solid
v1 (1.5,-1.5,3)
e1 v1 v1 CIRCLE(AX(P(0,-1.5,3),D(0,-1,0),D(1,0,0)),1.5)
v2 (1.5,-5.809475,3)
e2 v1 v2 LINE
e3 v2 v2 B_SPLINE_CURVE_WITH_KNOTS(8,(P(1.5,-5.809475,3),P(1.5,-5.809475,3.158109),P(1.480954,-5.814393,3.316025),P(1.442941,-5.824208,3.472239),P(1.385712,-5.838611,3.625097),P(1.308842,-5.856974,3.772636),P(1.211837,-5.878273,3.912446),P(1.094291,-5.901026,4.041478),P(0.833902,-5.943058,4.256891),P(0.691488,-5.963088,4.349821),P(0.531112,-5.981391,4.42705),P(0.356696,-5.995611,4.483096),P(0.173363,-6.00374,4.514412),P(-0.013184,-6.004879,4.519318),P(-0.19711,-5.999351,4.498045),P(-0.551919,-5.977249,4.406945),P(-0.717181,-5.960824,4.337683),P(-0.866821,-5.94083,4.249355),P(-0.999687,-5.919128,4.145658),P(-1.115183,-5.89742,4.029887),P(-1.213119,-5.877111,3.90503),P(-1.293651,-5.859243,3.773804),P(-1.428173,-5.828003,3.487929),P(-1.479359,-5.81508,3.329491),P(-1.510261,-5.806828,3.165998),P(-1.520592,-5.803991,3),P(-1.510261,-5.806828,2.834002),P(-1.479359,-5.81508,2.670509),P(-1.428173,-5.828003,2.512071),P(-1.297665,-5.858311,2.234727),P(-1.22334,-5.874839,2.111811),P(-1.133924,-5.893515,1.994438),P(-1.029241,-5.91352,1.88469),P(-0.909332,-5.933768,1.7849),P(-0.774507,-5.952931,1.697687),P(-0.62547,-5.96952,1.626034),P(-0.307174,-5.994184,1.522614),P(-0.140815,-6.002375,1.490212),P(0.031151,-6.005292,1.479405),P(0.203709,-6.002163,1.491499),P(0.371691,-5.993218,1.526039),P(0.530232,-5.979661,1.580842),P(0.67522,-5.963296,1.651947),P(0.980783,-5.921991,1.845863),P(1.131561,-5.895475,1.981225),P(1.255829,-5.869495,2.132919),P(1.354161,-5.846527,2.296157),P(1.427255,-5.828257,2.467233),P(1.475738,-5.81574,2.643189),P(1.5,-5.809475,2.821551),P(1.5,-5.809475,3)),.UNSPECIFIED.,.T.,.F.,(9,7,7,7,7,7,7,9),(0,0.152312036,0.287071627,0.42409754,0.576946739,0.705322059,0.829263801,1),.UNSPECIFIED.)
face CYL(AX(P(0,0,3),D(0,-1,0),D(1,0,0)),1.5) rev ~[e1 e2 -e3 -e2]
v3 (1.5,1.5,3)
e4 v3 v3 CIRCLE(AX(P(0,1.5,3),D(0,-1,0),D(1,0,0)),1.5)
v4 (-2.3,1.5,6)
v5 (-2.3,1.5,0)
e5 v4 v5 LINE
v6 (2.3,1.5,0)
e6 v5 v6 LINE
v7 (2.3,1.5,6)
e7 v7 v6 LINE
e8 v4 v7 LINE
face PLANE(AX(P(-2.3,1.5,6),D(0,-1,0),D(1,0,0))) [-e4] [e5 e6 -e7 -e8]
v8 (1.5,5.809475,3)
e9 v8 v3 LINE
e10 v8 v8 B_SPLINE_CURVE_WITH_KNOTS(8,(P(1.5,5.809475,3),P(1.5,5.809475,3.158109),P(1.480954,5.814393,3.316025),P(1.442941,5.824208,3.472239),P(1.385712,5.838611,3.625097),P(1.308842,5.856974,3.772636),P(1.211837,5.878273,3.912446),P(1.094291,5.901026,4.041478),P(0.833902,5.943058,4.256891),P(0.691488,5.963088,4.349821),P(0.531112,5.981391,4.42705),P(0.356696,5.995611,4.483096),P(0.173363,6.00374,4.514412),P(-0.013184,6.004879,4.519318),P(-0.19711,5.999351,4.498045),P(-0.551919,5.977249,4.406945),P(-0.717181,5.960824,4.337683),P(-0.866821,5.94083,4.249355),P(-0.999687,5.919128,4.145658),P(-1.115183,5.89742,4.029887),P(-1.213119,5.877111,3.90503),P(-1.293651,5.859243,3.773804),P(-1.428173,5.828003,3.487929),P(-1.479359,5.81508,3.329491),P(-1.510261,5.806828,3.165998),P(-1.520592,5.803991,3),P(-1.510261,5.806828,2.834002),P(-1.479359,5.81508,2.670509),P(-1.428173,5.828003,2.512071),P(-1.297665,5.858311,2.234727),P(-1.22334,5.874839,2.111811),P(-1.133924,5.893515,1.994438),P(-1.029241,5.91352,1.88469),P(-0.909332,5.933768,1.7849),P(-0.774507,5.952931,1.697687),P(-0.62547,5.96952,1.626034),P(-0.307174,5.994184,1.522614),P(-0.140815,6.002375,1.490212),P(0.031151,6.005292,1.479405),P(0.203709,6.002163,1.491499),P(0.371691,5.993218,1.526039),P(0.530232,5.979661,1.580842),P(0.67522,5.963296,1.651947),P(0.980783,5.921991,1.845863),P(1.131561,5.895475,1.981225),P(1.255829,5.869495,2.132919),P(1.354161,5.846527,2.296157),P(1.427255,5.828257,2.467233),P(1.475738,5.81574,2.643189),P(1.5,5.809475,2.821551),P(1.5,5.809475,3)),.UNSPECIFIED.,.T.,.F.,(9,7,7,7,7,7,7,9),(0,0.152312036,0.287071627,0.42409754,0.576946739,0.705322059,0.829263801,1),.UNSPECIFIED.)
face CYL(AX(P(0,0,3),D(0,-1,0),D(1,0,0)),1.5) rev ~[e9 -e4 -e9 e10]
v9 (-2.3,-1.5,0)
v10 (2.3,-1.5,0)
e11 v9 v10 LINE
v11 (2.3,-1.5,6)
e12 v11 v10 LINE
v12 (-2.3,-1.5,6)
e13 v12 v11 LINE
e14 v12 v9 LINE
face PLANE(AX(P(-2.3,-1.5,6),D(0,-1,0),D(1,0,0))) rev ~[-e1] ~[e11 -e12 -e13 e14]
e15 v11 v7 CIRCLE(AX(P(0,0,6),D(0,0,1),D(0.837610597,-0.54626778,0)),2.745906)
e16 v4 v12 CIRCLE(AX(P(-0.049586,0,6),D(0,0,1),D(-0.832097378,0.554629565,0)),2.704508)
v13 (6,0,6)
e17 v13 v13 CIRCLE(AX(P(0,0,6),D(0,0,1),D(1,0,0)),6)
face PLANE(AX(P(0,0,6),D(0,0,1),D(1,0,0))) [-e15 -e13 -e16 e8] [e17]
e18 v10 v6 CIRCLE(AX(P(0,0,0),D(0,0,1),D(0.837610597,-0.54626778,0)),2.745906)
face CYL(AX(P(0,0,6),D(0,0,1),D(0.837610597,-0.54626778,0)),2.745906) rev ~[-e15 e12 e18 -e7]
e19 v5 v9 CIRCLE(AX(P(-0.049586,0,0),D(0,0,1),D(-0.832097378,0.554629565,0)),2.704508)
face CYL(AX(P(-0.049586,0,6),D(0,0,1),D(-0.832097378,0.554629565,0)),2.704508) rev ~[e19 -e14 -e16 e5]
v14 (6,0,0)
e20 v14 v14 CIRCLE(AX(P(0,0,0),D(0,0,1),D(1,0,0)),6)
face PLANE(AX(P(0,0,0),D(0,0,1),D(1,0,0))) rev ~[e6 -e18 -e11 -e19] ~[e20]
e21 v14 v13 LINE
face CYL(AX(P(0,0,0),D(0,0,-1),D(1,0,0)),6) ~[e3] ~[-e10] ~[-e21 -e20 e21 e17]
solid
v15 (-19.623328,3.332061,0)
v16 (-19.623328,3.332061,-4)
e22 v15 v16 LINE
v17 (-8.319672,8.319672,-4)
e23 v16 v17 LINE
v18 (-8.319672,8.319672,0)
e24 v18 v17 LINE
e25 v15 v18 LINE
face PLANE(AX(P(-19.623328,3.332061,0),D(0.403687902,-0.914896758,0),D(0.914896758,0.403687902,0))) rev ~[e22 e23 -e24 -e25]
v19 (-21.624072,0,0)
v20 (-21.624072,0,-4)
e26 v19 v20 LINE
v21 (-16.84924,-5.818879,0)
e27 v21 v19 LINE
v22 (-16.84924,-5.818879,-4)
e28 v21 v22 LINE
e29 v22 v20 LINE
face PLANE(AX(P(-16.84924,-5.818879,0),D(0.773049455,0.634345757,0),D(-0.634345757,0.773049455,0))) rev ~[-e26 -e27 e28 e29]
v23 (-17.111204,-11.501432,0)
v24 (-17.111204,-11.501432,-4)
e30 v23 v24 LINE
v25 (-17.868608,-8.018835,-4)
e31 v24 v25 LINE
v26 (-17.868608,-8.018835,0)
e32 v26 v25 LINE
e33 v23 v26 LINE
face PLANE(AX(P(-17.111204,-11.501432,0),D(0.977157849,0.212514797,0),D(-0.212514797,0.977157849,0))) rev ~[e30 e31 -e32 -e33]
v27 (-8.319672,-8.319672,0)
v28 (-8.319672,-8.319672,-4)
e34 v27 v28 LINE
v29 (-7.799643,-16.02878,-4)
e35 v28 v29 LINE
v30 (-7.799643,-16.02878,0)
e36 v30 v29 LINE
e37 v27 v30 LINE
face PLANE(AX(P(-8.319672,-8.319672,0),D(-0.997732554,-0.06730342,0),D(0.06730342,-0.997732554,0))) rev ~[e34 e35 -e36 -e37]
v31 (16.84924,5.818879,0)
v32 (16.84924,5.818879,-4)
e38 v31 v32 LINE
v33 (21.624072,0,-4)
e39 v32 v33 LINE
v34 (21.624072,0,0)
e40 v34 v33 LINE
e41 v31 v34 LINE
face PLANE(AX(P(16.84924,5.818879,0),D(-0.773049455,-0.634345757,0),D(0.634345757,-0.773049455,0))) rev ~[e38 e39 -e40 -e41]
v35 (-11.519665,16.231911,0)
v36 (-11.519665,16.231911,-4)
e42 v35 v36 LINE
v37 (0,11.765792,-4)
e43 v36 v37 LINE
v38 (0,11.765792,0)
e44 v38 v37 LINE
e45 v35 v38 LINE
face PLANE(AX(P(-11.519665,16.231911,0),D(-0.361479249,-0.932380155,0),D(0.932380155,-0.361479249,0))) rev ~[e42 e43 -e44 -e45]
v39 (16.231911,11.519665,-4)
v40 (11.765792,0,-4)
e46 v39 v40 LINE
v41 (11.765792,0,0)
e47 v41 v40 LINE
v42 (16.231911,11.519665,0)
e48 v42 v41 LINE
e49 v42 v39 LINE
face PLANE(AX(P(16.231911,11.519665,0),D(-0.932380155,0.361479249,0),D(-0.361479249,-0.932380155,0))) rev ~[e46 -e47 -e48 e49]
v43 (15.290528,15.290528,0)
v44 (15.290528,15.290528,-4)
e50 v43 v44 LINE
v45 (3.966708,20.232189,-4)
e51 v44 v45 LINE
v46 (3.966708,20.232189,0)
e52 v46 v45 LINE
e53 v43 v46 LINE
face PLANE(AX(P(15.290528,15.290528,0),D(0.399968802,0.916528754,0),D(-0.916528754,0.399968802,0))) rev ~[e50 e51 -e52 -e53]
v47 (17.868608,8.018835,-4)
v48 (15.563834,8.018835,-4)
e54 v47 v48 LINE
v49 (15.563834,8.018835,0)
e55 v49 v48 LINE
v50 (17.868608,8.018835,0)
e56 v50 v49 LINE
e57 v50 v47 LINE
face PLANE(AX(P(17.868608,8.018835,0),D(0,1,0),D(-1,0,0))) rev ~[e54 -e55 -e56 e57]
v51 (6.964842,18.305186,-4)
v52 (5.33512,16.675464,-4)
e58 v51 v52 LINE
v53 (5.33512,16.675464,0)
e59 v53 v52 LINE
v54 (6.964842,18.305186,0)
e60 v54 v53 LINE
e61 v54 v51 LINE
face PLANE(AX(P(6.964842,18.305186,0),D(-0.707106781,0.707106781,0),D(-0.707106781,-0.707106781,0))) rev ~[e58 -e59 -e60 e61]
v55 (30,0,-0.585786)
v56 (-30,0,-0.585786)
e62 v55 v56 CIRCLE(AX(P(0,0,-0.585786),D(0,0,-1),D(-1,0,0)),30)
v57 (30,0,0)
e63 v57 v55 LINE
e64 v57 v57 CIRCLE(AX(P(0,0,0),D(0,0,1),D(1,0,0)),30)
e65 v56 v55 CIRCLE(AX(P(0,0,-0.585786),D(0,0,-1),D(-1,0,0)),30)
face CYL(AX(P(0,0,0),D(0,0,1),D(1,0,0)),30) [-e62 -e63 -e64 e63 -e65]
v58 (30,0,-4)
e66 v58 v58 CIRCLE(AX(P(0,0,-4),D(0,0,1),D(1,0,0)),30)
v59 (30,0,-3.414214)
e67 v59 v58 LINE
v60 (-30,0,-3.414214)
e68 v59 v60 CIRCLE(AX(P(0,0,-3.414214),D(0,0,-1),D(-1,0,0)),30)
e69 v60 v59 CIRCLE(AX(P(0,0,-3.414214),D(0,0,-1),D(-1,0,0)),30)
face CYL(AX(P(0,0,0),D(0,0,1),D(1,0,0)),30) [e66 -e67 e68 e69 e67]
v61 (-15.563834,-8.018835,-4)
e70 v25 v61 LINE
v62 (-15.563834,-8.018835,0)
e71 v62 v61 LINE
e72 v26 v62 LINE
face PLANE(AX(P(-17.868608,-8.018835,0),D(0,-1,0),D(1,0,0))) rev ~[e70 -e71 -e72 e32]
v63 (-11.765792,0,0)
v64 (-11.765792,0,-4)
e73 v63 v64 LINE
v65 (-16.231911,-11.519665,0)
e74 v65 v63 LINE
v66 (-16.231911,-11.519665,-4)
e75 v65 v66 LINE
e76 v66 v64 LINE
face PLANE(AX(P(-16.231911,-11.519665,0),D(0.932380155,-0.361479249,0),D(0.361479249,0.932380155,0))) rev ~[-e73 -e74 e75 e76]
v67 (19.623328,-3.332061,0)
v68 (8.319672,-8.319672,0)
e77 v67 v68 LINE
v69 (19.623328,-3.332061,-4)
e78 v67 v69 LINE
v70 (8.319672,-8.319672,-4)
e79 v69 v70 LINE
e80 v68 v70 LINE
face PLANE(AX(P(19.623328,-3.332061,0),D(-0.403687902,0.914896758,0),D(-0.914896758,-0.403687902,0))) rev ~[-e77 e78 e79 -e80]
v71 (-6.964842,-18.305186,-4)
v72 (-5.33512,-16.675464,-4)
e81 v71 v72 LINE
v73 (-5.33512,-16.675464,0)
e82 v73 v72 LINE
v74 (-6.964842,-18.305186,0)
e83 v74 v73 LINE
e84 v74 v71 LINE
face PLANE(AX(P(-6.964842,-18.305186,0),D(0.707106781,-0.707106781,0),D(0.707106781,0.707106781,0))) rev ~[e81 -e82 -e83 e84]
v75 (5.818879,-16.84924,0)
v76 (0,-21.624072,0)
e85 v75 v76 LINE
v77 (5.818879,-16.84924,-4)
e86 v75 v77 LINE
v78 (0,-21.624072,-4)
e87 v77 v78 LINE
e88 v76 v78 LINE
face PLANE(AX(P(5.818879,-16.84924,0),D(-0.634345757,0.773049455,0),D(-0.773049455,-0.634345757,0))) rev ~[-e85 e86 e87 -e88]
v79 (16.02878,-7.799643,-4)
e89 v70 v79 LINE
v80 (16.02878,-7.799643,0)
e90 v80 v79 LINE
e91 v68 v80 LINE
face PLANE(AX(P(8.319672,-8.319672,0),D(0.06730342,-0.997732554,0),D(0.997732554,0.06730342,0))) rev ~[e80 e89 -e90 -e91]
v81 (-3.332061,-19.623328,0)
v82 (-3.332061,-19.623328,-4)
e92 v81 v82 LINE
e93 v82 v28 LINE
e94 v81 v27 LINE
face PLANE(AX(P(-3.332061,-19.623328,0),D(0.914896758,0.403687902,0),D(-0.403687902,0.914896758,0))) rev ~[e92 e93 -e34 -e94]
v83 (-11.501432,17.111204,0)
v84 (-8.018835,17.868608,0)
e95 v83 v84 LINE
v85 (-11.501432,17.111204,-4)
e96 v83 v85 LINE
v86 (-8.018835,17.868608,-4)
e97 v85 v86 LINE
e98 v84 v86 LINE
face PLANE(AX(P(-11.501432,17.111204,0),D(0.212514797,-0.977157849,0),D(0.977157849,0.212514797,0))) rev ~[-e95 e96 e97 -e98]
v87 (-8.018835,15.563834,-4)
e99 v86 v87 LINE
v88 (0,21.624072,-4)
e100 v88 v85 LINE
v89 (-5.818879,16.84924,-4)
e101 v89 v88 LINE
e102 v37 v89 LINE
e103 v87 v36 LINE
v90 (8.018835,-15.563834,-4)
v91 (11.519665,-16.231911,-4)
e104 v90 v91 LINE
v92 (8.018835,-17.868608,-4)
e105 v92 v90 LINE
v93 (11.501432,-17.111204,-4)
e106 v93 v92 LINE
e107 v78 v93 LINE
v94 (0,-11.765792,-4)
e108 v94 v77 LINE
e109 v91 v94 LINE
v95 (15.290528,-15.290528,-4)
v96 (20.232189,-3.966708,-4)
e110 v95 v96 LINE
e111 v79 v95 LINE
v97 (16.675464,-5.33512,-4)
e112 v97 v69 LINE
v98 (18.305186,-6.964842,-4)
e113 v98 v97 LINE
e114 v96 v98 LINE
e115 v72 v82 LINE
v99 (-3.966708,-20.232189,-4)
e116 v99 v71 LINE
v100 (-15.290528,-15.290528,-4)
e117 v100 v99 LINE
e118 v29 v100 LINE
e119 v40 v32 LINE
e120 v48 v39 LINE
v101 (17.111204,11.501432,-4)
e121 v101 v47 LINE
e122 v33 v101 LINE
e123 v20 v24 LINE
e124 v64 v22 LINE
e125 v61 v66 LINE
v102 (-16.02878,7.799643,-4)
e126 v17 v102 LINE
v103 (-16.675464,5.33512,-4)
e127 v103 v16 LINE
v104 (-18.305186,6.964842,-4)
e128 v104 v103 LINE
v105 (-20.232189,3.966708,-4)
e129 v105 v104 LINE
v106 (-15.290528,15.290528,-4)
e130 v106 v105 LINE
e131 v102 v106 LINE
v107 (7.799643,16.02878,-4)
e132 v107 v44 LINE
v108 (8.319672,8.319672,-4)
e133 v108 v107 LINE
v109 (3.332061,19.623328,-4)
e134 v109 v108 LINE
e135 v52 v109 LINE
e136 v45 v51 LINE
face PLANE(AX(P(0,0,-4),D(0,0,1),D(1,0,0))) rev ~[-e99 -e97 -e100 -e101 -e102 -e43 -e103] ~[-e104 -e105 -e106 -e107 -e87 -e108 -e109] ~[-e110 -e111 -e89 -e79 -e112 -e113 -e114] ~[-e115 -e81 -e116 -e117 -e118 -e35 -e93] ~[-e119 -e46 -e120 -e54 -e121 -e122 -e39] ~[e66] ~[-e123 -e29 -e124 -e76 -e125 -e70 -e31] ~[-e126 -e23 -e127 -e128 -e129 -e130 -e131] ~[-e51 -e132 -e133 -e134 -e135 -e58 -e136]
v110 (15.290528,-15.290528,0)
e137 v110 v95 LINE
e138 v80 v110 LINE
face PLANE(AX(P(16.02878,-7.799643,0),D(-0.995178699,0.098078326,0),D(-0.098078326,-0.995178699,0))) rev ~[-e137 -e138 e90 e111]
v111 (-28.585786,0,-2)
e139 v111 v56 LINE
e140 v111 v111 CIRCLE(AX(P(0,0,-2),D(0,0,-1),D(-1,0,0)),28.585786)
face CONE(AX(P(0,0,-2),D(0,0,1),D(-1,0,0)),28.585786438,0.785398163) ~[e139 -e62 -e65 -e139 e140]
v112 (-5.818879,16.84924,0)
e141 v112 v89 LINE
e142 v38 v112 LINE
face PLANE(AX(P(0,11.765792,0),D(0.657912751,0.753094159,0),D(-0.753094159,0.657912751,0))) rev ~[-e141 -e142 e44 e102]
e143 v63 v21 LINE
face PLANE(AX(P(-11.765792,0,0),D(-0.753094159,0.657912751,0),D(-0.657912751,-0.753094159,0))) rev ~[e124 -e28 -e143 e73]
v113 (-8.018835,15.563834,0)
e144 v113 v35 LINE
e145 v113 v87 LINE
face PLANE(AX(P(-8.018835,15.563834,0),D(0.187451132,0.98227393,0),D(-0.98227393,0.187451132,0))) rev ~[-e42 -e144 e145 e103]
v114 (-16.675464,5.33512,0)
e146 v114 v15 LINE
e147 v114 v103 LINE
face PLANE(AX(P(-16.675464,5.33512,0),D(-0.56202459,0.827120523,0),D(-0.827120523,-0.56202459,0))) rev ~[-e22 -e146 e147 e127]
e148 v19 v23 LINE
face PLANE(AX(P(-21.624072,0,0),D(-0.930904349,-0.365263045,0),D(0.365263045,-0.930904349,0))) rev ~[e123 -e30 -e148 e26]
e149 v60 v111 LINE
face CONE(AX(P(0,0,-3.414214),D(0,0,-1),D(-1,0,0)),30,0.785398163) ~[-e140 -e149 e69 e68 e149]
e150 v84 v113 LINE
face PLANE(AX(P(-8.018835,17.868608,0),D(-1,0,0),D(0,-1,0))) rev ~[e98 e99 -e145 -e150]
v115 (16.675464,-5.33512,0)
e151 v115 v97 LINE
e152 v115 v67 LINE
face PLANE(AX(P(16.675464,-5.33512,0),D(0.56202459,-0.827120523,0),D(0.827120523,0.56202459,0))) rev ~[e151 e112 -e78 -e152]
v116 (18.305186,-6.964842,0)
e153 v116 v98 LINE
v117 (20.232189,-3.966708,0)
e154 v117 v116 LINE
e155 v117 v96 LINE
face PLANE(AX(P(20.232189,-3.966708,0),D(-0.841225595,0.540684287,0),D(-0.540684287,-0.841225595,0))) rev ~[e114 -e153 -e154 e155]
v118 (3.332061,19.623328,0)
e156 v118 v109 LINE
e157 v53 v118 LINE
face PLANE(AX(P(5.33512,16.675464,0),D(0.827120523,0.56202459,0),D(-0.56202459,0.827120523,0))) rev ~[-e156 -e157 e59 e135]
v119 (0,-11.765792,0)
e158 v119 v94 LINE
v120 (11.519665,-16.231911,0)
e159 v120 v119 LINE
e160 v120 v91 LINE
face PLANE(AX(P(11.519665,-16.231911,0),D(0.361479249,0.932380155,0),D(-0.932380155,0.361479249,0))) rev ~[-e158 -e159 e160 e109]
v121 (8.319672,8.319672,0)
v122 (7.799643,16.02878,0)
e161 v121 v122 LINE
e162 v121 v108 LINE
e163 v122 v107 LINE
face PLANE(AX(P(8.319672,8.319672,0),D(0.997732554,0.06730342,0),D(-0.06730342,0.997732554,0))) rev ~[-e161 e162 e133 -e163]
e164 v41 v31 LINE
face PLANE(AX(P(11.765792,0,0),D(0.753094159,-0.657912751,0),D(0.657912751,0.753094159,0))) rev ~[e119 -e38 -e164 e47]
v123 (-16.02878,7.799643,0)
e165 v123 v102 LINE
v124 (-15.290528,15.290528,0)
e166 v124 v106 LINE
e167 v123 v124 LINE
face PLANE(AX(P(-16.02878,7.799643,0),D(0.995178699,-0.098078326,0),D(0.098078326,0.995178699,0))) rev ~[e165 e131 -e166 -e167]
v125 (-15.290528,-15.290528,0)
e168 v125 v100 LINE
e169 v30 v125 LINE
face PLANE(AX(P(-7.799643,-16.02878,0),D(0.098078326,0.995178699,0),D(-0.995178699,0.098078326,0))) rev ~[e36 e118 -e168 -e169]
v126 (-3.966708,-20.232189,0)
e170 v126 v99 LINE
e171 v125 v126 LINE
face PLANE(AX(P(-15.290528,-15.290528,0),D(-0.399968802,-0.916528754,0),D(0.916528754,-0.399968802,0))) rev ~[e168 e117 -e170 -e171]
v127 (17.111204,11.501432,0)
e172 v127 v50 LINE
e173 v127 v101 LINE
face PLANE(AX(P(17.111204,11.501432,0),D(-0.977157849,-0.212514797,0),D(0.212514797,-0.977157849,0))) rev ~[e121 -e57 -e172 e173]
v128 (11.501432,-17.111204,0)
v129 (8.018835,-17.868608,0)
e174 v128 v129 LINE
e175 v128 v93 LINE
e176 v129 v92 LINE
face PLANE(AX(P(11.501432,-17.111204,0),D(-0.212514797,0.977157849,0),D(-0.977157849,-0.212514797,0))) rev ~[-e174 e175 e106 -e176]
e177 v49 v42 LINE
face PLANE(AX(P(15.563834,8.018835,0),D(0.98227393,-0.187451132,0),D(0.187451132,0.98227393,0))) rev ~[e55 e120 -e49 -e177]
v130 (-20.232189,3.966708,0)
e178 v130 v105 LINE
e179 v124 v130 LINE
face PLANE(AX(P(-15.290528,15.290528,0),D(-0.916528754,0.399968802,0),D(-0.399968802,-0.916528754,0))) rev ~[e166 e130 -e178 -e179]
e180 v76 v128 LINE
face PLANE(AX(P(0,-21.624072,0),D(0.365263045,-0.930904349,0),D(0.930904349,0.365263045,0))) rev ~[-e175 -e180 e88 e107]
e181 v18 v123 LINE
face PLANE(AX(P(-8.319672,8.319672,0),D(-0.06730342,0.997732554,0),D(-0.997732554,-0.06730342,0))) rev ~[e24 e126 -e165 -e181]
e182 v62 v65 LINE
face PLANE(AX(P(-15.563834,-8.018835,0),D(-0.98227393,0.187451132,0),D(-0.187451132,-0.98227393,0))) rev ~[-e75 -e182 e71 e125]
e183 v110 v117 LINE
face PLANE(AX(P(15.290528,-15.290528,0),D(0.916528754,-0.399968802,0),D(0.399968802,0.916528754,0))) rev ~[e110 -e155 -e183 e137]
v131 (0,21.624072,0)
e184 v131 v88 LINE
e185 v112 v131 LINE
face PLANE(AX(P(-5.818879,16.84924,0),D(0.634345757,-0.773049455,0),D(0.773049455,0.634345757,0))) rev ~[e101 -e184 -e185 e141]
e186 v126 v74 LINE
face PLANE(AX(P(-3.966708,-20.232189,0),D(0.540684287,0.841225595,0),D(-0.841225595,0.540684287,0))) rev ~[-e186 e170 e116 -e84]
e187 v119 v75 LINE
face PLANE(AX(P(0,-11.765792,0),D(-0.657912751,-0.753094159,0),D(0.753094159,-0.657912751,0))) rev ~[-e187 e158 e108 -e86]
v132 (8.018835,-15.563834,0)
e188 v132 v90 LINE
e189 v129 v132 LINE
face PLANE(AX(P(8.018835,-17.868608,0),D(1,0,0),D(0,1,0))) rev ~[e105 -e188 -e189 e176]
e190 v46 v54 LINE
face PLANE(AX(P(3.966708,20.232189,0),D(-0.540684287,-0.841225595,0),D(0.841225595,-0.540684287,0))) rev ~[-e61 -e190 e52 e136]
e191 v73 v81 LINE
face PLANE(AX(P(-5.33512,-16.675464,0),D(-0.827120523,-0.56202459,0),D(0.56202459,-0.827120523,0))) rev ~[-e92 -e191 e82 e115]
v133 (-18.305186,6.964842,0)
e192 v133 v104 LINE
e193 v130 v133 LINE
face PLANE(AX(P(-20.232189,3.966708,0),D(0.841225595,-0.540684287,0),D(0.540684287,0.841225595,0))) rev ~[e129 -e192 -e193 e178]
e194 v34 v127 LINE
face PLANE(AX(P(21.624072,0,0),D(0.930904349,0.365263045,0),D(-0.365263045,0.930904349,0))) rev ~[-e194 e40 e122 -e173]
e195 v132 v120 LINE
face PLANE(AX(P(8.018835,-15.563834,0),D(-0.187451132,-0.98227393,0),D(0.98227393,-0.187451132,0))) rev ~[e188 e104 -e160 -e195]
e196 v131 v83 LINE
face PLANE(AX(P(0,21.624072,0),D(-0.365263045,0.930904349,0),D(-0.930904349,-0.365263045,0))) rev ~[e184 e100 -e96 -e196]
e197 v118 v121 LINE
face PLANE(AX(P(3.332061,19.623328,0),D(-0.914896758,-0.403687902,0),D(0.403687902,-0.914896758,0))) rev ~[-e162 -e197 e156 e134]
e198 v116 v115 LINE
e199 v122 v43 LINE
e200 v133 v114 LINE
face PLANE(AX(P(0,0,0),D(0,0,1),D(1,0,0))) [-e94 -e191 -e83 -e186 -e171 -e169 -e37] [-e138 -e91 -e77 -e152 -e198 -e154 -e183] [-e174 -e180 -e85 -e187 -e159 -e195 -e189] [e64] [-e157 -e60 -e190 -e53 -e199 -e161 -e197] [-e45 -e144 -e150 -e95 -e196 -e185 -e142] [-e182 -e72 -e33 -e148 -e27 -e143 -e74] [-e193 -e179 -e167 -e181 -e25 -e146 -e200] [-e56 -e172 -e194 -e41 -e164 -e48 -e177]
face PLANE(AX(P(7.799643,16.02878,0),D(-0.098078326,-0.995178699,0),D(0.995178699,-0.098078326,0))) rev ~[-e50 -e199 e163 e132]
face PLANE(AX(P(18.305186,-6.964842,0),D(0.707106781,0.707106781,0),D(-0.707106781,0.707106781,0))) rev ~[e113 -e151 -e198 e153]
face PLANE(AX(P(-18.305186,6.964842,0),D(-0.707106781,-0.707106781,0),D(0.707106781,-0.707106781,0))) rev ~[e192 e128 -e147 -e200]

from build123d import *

# Parameters (mm, degrees)
F0_R             = 30
F0_R_2           = 6
F1_DEPTH         = 4
F2_DEPTH         = 6
F3_R             = 1.5
F4_DEPTH         = 7.5
F5_W             = 4.6
F5_H             = 3
F6_DEPTH         = 9.4
F10_DEPTH        = 4
F10_COPIES_COUNT = 8


# Not quite as in the source:
# - a pattern or mirror of a feature is missing from the dataset's text; its kind, count and spacing are read off the source's solid


with BuildPart() as f1:
    # F0 (on Top) → F1 (new body)
    with BuildSketch(Plane.XY):
        Circle(F0_R)
        Circle(F0_R_2, mode=Mode.SUBTRACT)
        Circle(F0_R_2)
    extrude(amount=-F1_DEPTH)

    # F7 (on Front) → F8 (revolve, cut)
    with BuildSketch(Plane.XZ):
        Polygon((-28.5857864376, -2), (-30, -0.5857864376), (-30, -3.4142135624), align=None)
    revolve(axis=Axis((0, 0, 5.5037373677), (0, 0, -1)), mode=Mode.SUBTRACT)

    # F9 (on face) → F10 (cut, through all)
    with BuildSketch(Plane.XY):
        Polygon((-5.8188787661, 16.8492398092), (0, 21.6240715235), (-11.5014315608, 17.1112040934), (-8.0188345164, 17.8686082363), (-8.0188345164, 15.5638335273), (-11.5196653077, 16.2319106039), (0, 11.7657924248), align=None)
    f10 = extrude(amount=-F10_DEPTH, mode=Mode.SUBTRACT)

    # F10_copies: F10 ×8 about axis
    f10_copies_axis = Axis((0, 0, 0), (0, 0, 1))
    for i in range(1, F10_COPIES_COUNT):
        add(f10.rotate(f10_copies_axis, i * 360 / F10_COPIES_COUNT), mode=Mode.SUBTRACT)


with BuildPart() as f2:
    # F0 (on Top) → F2 (new body)
    with BuildSketch(Plane.XY):
        Circle(F0_R_2)
    extrude(amount=F2_DEPTH)

    # F3 (on Front) → F4 (cut, symmetric)
    with BuildSketch(Plane.XZ):
        with Locations((0, 3)):
            Circle(F3_R)
    extrude(amount=F4_DEPTH, both=True, mode=Mode.SUBTRACT)

    # F5 (on face) → F6 (cut)
    with BuildSketch(Plane.XY.offset(6)):
        Rectangle(F5_W, F5_H)
        with BuildLine():
            Line((2.3, 1.5), (2.3, -1.5))
            ThreePointArc((2.3, -1.5), (2.7459060435, 0), (2.3, 1.5))
        make_face()
        with BuildLine():
            ThreePointArc((-2.3, 1.5), (-2.7540939565, 0), (-2.3, -1.5))
            Line((-2.3, -1.5), (-2.3, 1.5))
        make_face()
    extrude(amount=-F6_DEPTH, mode=Mode.SUBTRACT)


solid = Compound([f1.part, f2.part])
